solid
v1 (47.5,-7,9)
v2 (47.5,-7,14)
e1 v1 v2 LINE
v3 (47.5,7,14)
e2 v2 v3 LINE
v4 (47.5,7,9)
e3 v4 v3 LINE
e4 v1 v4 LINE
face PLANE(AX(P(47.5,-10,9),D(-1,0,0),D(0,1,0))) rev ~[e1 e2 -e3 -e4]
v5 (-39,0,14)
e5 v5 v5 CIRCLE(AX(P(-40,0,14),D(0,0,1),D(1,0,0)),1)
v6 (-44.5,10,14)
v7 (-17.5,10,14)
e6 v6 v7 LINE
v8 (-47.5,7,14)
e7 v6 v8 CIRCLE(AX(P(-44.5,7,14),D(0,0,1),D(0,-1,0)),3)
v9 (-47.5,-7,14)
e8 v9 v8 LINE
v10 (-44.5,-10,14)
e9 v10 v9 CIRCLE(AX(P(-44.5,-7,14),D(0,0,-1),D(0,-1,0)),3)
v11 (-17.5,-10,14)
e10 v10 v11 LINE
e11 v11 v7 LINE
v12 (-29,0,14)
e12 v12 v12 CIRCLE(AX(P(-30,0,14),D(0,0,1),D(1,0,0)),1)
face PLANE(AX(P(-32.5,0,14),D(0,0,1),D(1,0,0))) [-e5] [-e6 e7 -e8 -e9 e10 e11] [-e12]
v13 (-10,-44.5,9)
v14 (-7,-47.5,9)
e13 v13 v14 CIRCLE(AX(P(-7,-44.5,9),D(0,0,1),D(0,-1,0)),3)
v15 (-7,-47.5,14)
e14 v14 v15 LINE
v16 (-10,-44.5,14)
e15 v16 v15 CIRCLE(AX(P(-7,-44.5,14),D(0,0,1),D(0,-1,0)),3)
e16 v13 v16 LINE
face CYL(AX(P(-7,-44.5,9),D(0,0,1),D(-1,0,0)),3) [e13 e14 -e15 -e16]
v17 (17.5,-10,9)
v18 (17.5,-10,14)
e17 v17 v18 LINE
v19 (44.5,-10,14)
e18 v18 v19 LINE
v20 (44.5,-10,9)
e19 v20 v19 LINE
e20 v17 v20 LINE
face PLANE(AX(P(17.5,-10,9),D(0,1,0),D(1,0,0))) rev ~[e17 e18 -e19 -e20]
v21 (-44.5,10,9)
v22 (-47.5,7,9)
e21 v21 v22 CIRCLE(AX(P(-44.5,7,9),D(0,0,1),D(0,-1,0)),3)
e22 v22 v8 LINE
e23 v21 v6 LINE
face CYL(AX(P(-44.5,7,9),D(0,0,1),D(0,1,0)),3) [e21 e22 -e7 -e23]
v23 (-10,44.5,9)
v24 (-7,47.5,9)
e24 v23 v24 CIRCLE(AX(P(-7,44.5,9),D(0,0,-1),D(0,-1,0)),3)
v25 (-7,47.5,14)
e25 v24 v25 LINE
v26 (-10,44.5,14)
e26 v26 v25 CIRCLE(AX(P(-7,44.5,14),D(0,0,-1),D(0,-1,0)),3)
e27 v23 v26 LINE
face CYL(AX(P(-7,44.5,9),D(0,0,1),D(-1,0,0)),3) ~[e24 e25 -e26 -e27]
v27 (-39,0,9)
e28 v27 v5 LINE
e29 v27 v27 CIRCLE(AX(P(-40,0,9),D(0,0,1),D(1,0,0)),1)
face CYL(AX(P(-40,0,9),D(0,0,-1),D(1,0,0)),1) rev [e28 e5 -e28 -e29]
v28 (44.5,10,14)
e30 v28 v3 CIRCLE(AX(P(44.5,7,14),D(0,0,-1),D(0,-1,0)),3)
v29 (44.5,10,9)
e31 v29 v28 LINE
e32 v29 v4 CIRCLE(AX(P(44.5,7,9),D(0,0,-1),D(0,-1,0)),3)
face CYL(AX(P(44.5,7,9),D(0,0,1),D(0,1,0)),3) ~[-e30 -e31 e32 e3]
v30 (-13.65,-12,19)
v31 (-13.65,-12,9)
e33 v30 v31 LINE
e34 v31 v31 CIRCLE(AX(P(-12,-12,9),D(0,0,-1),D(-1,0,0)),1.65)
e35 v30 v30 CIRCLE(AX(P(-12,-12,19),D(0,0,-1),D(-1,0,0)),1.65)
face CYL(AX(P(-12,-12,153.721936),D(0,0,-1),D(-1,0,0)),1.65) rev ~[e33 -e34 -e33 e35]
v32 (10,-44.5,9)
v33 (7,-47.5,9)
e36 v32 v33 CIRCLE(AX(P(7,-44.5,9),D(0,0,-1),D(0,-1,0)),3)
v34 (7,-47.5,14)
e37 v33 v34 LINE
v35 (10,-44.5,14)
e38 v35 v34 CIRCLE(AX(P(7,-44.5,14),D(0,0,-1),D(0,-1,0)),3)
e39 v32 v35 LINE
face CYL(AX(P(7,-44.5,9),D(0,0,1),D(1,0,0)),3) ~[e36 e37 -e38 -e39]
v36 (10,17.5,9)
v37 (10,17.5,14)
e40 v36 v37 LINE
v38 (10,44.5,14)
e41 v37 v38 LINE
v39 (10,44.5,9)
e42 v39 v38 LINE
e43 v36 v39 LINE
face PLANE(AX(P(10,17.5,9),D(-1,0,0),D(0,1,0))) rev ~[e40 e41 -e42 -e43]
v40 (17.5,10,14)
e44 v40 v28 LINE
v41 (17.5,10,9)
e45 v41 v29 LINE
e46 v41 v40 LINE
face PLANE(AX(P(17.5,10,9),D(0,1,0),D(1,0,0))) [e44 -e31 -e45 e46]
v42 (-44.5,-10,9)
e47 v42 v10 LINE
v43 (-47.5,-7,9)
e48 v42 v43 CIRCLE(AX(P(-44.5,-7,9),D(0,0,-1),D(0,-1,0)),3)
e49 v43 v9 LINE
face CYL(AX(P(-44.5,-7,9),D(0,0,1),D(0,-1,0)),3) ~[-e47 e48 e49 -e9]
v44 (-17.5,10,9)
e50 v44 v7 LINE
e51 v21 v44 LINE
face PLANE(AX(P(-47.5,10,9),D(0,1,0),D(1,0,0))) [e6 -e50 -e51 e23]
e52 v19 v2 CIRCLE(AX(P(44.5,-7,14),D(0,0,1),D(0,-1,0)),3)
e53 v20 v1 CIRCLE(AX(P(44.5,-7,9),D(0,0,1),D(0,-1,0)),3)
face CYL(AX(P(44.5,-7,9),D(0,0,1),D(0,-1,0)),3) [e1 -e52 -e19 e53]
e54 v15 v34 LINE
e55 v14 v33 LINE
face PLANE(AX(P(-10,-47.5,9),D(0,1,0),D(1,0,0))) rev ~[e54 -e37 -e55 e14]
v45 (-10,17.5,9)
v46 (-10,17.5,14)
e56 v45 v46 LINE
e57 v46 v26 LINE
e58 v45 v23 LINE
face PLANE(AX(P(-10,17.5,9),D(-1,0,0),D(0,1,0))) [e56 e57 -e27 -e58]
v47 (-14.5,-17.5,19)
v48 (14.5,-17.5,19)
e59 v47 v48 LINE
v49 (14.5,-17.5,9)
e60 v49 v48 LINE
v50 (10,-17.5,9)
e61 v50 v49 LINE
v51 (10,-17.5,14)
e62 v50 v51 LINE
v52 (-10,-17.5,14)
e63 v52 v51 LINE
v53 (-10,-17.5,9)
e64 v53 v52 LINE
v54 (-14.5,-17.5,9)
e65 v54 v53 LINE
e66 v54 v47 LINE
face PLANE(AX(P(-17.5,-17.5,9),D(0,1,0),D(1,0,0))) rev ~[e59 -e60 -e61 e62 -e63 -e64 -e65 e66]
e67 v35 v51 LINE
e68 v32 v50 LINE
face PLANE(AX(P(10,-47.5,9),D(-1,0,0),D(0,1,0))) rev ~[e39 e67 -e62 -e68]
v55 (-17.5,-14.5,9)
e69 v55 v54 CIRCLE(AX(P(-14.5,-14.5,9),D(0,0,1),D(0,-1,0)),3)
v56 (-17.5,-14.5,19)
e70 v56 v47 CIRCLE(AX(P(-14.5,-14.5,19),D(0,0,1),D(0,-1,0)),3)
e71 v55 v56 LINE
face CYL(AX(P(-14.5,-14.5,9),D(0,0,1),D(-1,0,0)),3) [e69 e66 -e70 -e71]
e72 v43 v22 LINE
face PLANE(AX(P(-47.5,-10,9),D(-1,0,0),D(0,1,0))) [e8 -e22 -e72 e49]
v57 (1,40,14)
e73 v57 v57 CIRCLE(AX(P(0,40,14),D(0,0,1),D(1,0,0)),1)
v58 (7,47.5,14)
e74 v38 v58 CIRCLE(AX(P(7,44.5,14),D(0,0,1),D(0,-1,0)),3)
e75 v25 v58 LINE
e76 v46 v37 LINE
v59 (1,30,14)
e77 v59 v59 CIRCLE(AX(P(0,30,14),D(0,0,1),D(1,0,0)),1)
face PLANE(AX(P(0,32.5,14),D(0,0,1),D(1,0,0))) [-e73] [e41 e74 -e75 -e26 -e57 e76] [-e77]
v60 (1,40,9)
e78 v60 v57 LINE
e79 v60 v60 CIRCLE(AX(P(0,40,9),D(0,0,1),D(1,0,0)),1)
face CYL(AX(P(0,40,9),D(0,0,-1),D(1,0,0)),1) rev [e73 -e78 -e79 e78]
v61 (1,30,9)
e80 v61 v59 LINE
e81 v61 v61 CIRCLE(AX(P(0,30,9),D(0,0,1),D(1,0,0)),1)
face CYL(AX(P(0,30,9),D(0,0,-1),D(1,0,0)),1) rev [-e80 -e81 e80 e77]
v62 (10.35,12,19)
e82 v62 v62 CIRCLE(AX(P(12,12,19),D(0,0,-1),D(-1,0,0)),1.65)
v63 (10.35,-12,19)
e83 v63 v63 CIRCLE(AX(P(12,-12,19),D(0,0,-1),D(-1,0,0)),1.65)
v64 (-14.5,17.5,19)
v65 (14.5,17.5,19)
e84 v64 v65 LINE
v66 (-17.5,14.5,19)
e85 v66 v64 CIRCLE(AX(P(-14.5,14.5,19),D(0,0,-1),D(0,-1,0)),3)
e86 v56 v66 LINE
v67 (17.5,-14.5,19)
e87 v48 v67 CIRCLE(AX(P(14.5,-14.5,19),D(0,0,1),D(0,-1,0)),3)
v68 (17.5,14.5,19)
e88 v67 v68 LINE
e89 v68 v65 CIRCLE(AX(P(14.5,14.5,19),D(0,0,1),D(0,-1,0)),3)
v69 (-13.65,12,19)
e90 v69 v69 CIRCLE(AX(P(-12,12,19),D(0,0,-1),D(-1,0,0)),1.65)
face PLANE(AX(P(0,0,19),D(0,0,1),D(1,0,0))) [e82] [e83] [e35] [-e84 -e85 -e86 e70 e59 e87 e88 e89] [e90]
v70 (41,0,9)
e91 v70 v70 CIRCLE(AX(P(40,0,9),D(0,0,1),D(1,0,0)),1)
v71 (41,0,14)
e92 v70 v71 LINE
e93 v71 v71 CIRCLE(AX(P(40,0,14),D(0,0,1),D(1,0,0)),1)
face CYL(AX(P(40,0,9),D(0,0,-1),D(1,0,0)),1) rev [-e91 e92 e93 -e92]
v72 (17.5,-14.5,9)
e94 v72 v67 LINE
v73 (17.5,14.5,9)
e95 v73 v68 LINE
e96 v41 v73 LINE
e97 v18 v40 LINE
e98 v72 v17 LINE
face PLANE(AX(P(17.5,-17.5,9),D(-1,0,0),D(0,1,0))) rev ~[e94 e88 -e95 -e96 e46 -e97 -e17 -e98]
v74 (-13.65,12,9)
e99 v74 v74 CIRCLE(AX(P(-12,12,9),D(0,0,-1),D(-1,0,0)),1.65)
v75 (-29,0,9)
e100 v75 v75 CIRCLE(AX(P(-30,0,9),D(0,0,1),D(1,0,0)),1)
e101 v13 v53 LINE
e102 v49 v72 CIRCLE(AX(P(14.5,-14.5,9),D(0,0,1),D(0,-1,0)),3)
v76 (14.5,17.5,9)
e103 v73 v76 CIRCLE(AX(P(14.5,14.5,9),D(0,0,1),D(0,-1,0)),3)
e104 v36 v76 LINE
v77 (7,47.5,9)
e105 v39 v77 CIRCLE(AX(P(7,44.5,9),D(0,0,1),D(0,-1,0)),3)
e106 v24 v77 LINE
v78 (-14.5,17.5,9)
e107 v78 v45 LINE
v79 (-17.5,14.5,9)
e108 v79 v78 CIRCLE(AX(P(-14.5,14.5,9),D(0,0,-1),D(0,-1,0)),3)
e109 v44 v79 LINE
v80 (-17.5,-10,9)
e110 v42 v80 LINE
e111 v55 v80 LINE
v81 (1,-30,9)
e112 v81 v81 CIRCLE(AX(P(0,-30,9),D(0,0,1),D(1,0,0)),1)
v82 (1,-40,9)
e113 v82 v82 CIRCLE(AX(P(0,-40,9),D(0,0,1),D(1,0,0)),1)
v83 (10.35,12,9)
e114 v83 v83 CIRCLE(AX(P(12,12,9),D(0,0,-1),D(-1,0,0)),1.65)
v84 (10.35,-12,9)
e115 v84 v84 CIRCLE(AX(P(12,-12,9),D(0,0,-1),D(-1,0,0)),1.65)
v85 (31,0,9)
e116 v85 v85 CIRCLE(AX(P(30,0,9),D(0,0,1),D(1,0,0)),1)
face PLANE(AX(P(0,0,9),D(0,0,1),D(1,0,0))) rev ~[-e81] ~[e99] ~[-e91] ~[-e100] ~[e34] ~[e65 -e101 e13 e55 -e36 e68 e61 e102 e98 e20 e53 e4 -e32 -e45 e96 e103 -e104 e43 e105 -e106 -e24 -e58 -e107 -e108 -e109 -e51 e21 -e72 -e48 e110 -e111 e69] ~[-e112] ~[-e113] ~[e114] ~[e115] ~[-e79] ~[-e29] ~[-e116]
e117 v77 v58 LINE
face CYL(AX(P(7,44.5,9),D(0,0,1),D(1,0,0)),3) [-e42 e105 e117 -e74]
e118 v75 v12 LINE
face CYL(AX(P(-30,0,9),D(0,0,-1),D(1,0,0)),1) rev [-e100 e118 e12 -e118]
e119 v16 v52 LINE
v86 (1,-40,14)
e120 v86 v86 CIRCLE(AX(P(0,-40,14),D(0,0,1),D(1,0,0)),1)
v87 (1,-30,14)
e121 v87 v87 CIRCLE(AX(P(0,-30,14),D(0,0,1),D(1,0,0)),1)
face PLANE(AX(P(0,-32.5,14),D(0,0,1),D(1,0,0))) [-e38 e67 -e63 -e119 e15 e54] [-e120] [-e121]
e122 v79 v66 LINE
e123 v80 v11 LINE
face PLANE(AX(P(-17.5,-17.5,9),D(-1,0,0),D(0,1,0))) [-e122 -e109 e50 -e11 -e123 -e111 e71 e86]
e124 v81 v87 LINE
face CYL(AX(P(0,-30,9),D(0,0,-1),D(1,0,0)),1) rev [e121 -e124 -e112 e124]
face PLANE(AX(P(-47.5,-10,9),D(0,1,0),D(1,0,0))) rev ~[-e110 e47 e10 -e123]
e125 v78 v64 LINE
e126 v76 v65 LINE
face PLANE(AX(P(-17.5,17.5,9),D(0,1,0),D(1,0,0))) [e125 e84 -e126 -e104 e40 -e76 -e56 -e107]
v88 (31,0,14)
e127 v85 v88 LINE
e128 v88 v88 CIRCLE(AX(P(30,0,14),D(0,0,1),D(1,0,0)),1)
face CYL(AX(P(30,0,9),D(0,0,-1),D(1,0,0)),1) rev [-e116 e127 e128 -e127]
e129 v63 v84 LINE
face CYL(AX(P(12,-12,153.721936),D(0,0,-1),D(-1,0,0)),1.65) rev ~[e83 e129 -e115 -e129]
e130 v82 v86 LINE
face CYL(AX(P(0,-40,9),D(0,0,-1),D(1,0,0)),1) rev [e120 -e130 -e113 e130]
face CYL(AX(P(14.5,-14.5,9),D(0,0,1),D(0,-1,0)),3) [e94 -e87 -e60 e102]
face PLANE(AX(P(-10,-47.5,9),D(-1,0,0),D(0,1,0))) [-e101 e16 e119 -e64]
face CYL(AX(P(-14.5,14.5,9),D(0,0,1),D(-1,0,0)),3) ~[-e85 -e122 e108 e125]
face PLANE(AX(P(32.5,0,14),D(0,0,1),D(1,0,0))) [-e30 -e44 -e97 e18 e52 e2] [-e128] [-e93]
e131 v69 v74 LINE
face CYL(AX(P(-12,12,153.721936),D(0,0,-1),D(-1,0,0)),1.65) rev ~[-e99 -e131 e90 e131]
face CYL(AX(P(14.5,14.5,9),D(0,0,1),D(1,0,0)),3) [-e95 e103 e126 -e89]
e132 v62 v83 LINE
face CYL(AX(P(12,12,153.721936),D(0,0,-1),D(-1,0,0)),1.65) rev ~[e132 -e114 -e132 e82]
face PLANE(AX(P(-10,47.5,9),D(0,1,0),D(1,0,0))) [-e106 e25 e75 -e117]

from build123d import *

# Parameters (mm, degrees)
F1_W     = 35
F1_H     = 35
F2_DEPTH = 10
F3_R     = 3
F4_W     = 30
F4_H     = 20
F4_R     = 1
F4_W_2   = 20
F4_H_2   = 30
F5_DEPTH = 5
F6_R     = 3
F8_D     = 3.3


with BuildPart() as f2:
    # F1 (on offset) → F2 (new body)
    with BuildSketch(Plane.XY.offset(9)):
        Rectangle(F1_W, F1_H)
    extrude(amount=F2_DEPTH)

    # F3
    f3_edges = [f2.edges().sort_by_distance(p)[0] for p in [
        (-17.5, -17.5, 14),
        (17.5, -17.5, 14),
        (17.5, 17.5, 14),
        (-17.5, 17.5, 14),
    ]]
    fillet(f3_edges, radius=F3_R)

    # F4 (on offset) → F5 (join)
    with BuildSketch(Plane.XY.offset(9)):
        with Locations((32.5, 0)):
            Rectangle(F4_W, F4_H)
        with Locations((30, 0)):
            Circle(F4_R, mode=Mode.SUBTRACT)
        with Locations((40, 0)):
            Circle(F4_R, mode=Mode.SUBTRACT)
        with Locations((-32.5, 0)):
            Rectangle(F4_W, F4_H)
        with Locations((-40, 0)):
            Circle(F4_R, mode=Mode.SUBTRACT)
        with Locations((-30, 0)):
            Circle(F4_R, mode=Mode.SUBTRACT)
        with Locations((0, -32.5)):
            Rectangle(F4_W_2, F4_H_2)
        with Locations((0, -40)):
            Circle(F4_R, mode=Mode.SUBTRACT)
        with Locations((0, -30)):
            Circle(F4_R, mode=Mode.SUBTRACT)
        with Locations((0, 32.5)):
            Rectangle(F4_W_2, F4_H_2)
        with Locations((0, 30)):
            Circle(F4_R, mode=Mode.SUBTRACT)
        with Locations((0, 40)):
            Circle(F4_R, mode=Mode.SUBTRACT)
    extrude(amount=F5_DEPTH)

    # F6
    f6_edges = [f2.edges().sort_by_distance(p)[0] for p in [
        (-47.5, 10, 11.5),
        (-47.5, -10, 11.5),
        (-10, -47.5, 11.5),
        (10, -47.5, 11.5),
        (47.5, -10, 11.5),
        (47.5, 10, 11.5),
        (10, 47.5, 11.5),
        (-10, 47.5, 11.5),
    ]]
    fillet(f6_edges, radius=F6_R)

    # F8 (through all)
    with Locations(Plane.XY.offset(19)):
        with Locations((-12, 12), (12, 12), (12, -12), (-12, -12)):
            Hole(F8_D / 2)


solid = f2.part
